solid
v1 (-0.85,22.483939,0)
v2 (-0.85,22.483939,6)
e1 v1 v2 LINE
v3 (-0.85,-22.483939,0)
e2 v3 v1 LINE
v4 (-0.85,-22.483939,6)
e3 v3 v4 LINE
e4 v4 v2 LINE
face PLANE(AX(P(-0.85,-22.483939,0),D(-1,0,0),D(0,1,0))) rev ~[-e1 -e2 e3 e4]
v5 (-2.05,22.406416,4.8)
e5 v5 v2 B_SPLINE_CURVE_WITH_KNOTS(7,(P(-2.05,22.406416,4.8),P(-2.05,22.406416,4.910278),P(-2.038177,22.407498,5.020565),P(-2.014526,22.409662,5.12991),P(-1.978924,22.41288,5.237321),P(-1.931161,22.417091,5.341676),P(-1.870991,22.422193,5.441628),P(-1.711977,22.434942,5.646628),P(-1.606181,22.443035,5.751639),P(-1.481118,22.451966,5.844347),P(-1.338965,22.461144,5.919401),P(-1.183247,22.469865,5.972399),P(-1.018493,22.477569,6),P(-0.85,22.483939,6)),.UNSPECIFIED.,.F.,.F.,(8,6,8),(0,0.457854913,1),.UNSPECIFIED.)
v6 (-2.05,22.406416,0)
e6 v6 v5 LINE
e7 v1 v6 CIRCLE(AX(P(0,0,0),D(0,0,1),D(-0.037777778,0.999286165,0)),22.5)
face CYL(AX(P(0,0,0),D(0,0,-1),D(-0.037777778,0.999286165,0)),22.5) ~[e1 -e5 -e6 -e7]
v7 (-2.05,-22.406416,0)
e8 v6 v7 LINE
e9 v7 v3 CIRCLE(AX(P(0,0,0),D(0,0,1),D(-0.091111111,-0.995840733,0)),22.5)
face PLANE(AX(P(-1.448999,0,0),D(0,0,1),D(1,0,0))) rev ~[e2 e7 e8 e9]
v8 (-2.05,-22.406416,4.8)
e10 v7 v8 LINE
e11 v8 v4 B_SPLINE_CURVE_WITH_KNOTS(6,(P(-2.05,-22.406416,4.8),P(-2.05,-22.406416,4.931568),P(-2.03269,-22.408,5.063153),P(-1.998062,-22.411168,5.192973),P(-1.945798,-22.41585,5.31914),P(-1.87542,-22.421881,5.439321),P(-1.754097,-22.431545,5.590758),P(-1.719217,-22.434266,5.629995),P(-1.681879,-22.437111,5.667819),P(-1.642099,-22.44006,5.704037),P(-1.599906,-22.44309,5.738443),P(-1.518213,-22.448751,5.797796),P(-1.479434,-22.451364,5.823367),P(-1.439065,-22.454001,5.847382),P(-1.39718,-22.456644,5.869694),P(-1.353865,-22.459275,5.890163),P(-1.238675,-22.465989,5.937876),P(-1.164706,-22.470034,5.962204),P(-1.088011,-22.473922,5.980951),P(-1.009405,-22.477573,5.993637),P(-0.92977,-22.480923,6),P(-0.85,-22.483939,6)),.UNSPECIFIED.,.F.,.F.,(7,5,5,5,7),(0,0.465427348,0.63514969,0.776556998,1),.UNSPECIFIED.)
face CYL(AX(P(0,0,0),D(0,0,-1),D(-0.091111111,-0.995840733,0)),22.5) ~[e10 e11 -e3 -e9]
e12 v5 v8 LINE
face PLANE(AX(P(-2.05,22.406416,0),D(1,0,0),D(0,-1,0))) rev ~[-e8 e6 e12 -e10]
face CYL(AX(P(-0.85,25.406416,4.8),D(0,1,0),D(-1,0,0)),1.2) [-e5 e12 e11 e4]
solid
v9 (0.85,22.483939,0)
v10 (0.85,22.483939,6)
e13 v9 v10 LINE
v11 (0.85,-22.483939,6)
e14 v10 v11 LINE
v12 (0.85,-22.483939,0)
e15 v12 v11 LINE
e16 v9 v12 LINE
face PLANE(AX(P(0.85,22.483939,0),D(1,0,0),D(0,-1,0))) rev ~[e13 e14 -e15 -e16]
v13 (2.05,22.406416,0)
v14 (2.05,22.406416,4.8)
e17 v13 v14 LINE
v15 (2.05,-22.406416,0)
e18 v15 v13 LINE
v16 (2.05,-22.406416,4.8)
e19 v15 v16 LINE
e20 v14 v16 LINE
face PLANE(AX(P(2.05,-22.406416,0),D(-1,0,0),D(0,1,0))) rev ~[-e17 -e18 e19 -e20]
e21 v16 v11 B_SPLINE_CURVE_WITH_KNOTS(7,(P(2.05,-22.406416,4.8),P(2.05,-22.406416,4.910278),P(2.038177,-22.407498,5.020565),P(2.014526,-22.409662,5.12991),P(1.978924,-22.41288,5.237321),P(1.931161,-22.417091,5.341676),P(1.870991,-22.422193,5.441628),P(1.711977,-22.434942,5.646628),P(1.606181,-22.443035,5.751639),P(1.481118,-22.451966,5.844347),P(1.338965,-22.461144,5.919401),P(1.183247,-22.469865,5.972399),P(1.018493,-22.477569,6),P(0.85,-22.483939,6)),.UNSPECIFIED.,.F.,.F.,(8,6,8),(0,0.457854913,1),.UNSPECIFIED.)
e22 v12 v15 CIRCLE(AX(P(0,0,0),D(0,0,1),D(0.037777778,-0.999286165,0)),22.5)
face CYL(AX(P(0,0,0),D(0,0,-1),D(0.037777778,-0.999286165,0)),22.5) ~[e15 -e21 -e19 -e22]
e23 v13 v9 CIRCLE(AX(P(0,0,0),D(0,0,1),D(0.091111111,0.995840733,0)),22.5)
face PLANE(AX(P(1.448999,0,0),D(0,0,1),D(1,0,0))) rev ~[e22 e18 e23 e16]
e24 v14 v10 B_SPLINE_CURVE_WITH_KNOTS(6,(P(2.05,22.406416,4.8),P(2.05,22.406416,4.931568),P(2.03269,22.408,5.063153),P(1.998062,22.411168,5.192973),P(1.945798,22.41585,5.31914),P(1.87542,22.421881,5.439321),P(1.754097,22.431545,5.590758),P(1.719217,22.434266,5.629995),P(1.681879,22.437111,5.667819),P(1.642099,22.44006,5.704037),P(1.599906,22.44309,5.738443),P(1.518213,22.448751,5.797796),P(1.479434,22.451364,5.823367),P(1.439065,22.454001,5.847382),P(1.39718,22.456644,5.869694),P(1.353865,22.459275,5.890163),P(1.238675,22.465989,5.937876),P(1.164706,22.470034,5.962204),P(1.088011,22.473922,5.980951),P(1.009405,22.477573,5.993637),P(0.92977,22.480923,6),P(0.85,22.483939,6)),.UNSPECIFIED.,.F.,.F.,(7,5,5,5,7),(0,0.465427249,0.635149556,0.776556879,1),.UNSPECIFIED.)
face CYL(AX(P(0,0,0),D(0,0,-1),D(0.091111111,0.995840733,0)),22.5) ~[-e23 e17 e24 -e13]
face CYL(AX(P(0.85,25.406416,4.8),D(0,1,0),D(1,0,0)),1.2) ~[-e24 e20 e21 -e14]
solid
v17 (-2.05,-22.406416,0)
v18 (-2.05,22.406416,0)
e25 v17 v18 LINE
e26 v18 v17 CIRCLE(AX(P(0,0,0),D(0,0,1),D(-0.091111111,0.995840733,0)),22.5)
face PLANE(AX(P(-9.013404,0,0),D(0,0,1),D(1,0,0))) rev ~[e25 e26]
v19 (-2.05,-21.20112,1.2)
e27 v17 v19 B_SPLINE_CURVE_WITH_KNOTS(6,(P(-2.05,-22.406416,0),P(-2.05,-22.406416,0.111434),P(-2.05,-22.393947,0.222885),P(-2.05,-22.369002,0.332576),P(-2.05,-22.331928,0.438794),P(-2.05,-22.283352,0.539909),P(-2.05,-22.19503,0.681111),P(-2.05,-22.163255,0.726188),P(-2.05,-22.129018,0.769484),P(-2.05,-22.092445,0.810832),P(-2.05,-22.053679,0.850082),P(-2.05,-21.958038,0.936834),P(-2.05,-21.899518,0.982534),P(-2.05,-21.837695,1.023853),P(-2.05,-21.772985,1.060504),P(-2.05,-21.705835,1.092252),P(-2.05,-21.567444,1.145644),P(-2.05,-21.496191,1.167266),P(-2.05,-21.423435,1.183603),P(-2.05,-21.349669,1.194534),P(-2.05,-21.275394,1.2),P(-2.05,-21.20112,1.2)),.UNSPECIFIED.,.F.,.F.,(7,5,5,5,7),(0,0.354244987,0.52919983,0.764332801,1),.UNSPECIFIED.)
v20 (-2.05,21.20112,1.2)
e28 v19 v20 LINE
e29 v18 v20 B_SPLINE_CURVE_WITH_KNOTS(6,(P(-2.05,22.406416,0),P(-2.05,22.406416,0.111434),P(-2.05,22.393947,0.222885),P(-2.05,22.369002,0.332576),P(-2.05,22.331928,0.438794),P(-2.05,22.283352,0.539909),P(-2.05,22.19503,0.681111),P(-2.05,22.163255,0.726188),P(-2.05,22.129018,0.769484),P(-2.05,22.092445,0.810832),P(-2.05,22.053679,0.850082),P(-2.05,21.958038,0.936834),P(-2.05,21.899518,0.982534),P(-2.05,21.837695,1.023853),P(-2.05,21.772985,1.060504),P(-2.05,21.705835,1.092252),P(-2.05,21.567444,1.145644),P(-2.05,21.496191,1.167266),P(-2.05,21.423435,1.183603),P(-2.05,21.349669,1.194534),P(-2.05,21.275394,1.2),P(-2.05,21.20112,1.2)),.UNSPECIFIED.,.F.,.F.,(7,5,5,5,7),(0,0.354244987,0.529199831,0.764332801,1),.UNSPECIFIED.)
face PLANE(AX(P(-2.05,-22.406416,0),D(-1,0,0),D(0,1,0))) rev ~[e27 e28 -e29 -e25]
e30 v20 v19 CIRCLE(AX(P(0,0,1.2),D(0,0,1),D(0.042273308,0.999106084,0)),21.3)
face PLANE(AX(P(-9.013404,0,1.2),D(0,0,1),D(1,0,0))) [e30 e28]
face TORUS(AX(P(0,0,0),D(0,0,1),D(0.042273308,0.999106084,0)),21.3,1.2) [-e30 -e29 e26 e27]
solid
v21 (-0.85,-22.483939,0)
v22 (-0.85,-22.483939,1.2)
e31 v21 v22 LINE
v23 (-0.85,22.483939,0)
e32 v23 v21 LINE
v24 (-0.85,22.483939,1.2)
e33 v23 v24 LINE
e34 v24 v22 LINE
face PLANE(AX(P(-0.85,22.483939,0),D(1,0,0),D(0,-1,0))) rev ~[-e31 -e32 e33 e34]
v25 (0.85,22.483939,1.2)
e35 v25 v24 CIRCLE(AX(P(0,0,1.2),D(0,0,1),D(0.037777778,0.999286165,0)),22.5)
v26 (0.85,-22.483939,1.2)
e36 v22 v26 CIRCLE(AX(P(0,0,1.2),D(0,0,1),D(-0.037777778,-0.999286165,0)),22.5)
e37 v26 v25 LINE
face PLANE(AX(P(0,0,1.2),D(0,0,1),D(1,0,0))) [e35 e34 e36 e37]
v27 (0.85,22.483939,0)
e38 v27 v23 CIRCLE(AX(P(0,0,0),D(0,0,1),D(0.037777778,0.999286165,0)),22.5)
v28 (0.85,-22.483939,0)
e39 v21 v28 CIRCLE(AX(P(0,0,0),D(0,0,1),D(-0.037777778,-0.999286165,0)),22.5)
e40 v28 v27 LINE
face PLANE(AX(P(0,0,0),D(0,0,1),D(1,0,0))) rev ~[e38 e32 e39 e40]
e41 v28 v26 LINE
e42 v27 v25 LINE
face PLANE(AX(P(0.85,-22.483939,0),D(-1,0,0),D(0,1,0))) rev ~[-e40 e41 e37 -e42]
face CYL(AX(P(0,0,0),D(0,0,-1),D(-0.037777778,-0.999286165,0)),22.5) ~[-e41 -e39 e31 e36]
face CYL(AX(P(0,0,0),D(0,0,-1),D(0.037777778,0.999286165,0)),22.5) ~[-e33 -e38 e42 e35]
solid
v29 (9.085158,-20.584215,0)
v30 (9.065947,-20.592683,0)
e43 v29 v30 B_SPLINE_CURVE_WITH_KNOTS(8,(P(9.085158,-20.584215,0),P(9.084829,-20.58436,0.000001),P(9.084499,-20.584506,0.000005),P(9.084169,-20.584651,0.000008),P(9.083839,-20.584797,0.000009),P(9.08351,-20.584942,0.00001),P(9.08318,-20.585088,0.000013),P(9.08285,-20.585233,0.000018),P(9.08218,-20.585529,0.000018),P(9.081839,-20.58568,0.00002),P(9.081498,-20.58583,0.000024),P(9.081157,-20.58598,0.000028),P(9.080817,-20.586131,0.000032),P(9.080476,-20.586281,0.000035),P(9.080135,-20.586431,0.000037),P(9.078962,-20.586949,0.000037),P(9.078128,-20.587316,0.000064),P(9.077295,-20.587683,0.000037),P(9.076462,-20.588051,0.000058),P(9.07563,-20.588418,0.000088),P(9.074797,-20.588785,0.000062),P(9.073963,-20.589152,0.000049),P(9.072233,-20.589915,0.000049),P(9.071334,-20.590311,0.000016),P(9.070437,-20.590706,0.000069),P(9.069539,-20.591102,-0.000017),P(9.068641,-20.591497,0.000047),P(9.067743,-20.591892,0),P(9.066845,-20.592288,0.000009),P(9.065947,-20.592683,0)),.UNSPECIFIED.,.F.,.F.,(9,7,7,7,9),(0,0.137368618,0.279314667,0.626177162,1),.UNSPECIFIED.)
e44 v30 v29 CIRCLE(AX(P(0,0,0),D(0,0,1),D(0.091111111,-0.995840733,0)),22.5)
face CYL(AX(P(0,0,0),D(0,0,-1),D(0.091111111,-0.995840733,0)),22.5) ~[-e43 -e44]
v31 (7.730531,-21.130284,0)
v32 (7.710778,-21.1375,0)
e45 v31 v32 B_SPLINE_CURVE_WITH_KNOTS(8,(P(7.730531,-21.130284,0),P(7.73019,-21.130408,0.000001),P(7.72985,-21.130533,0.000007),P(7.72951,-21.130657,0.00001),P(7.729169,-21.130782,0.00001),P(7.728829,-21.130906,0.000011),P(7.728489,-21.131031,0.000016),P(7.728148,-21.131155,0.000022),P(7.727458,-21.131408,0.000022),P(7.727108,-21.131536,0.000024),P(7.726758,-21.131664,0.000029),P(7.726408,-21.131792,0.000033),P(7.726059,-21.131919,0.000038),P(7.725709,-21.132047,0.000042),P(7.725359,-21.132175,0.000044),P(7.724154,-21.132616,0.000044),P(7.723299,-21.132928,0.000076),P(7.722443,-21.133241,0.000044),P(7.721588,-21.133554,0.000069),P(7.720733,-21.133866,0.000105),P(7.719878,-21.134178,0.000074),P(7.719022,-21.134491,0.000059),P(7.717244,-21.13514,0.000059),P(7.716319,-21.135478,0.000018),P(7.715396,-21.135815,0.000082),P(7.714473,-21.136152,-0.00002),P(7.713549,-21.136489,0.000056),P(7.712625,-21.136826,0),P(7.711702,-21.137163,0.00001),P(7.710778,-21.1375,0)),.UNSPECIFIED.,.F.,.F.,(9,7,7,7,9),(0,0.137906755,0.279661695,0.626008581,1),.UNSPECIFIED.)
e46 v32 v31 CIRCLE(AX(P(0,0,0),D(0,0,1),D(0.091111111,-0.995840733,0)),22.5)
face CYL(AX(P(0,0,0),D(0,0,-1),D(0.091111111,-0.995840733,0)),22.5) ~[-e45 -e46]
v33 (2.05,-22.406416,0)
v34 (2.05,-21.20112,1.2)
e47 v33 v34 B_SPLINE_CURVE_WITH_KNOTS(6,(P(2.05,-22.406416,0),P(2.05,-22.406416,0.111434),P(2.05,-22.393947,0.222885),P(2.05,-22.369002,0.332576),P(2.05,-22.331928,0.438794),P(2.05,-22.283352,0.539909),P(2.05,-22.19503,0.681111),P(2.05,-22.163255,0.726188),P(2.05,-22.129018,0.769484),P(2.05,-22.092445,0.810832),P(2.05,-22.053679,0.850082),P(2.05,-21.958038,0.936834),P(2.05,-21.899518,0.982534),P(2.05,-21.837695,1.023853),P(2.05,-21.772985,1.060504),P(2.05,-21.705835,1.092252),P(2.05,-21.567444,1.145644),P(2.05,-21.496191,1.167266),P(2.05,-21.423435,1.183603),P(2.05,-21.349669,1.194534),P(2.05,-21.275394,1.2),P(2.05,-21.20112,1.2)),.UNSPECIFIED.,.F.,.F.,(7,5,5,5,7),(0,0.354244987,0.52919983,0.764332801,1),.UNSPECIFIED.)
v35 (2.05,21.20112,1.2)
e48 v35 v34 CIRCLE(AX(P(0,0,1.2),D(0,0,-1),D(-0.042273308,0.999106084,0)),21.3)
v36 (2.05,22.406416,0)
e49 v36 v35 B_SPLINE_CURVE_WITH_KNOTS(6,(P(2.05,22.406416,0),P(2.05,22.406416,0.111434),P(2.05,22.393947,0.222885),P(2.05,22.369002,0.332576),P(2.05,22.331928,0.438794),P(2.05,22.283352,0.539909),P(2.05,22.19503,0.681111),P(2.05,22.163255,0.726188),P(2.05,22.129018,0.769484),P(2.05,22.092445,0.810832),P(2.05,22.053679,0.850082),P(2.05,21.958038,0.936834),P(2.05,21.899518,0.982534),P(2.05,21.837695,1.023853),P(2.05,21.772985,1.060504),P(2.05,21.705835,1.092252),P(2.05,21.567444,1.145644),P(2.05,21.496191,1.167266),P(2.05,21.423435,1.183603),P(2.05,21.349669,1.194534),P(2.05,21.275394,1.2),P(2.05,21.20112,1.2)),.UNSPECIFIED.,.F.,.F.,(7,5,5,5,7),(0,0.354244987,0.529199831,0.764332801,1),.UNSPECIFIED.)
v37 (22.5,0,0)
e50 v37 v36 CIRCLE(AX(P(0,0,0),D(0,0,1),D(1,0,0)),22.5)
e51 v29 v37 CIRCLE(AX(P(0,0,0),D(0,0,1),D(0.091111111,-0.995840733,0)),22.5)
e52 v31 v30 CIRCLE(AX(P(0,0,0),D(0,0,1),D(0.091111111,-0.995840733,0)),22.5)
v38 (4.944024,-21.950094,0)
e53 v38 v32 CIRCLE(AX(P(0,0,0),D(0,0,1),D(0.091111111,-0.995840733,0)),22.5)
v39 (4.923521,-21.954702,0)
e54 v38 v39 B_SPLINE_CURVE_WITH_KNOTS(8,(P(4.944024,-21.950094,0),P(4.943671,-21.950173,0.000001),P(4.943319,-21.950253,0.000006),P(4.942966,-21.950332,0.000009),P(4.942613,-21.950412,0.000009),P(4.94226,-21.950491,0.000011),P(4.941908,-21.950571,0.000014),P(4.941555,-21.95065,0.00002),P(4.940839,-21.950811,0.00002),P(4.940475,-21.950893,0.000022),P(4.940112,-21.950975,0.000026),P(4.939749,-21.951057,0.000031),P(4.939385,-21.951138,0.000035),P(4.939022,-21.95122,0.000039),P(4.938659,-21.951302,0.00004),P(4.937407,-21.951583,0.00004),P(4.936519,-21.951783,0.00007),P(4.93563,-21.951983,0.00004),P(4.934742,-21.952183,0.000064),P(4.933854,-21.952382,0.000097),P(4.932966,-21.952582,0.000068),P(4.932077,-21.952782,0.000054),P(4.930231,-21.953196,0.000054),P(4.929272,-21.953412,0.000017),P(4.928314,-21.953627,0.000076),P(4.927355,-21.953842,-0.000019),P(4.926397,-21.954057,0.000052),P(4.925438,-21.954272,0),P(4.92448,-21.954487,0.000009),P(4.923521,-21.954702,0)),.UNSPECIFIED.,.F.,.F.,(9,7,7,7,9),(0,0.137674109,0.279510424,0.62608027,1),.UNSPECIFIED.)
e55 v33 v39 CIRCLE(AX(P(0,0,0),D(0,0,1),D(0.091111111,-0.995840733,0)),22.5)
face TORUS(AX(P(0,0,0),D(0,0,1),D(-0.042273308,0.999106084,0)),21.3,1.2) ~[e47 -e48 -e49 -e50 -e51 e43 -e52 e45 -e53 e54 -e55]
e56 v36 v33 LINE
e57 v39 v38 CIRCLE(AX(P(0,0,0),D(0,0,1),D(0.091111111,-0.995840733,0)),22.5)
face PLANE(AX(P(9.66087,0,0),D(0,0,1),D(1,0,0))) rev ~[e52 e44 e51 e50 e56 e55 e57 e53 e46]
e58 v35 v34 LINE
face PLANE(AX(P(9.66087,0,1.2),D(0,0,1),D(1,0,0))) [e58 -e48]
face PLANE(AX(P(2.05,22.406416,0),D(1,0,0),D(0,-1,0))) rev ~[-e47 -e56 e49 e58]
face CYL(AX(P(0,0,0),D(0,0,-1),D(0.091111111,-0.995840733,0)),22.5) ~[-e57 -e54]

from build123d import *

# Parameters (mm, degrees)
F1_DEPTH      = 1.2
F2_DEPTH      = 6
F3_T2_ANGLE   = 184.8456081764
F3_2_T2_ANGLE = 184.8456081764
F3_3_T1_DEPTH = 50.8128329834
F3_4_T1_DEPTH = 50.8128329834


# Not quite as in the source:
# - a fillet or chamfer that OpenCascade refuses, or shapes differently, is made with other operations: its cross-section is extruded or revolved along the edge and cut away or added


with BuildPart() as f1:
    # F0 (on Top) → F1 (new body)
    with BuildSketch(Plane.XY):
        with BuildLine():
            Line((-2.05, -22.4064164917), (-2.05, 22.4064164917))
            ThreePointArc((-2.05, 22.4064164917), (-22.5, 0), (-2.05, -22.4064164917))
        make_face()
    extrude(amount=F1_DEPTH)

    # F3: fillet of radius 1.2 on 1 edges, made by hand

    # F3_s1 → F3_t2 (revolve, cut)
    with BuildSketch(Plane(origin=(0, 0, 0), x_dir=(0, 0, 1), z_dir=(0.9991060842, -0.0422733077, 0))):
        with BuildLine():
            ThreePointArc((0, -22.5), (0.8485281374, -22.1485281374), (1.2, -21.3))
            Line((1.2, -21.3), (1.2, -22.5))
            Line((1.2, -22.5), (0, -22.5))
        make_face()
    revolve(axis=Axis((0, 0, 1.2), (0, 0, 1)), revolution_arc=F3_T2_ANGLE, mode=Mode.SUBTRACT)


with BuildPart() as f1b:
    # F0 (on Top) → F1, piece 2 (new body)
    with BuildSketch(Plane.XY):
        with BuildLine():
            Line((0.85, -22.4839387119), (0.85, 22.4839387119))
            ThreePointArc((0.85, 22.4839387119), (0, 22.5), (-0.85, 22.4839387119))
            Line((-0.85, 22.4839387119), (-0.85, -22.4839387119))
            ThreePointArc((-0.85, -22.4839387119), (0, -22.5), (0.85, -22.4839387119))
        make_face()
    extrude(amount=F1_DEPTH)


with BuildPart() as f1c:
    # F0 (on Top) → F1, piece 3 (new body)
    with BuildSketch(Plane.XY):
        with BuildLine():
            ThreePointArc((2.05, -22.4064164917), (16.6188898546, -15.1678113121), (22.5, 0))
            ThreePointArc((22.5, 0), (16.6188898546, 15.1678113121), (2.05, 22.4064164917))
            Line((2.05, 22.4064164917), (2.05, -22.4064164917))
        make_face()
    extrude(amount=F1_DEPTH)

    # F3#2: fillet of radius 1.2 on 1 edges, made by hand

    # F3_2_s1 → F3_2_t2 (revolve, cut)
    with BuildSketch(Plane(origin=(0, 0, 0), x_dir=(0, 0, 1), z_dir=(-0.9991060842, -0.0422733077, 0))):
        with BuildLine():
            ThreePointArc((0, 22.5), (0.8485281374, 22.1485281374), (1.2, 21.3))
            Line((1.2, 21.3), (1.2, 22.5))
            Line((1.2, 22.5), (0, 22.5))
        make_face()
    revolve(axis=Axis((0, 0, 1.2), (0, 0, -1)), revolution_arc=F3_2_T2_ANGLE, mode=Mode.SUBTRACT)


with BuildPart() as f2:
    # F0 (on Top) → F2 (new body)
    with BuildSketch(Plane.XY):
        with BuildLine():
            Line((2.05, -22.4064164917), (2.05, 22.4064164917))
            ThreePointArc((2.05, 22.4064164917), (1.4505179846, 22.4531957097), (0.85, 22.4839387119))
            Line((0.85, 22.4839387119), (0.85, -22.4839387119))
            ThreePointArc((0.85, -22.4839387119), (1.4505179846, -22.4531957097), (2.05, -22.4064164917))
        make_face()
    extrude(amount=F2_DEPTH)

    # F3#3: fillet of radius 1.2 on 1 edges, made by hand

    # F3_3_s2 → F3_3_t1 (cut)
    with BuildSketch(Plane.XZ.offset(-25.4064164917)):
        with BuildLine():
            ThreePointArc((2.05, 4.8), (1.6985281374, 5.6485281374), (0.85, 6))
            Line((0.85, 6), (2.05, 6))
            Line((2.05, 6), (2.05, 4.8))
        make_face()
    extrude(amount=F3_3_T1_DEPTH, mode=Mode.SUBTRACT)


with BuildPart() as f2b:
    # F0 (on Top) → F2, piece 2 (new body)
    with BuildSketch(Plane.XY):
        with BuildLine():
            Line((-0.85, -22.4839387119), (-0.85, 22.4839387119))
            ThreePointArc((-0.85, 22.4839387119), (-1.4505179846, 22.4531957097), (-2.05, 22.4064164917))
            Line((-2.05, 22.4064164917), (-2.05, -22.4064164917))
            ThreePointArc((-2.05, -22.4064164917), (-1.4505179846, -22.4531957097), (-0.85, -22.4839387119))
        make_face()
    extrude(amount=F2_DEPTH)

    # F3#4: fillet of radius 1.2 on 1 edges, made by hand

    # F3_4_s2 → F3_4_t1 (cut)
    with BuildSketch(Plane.XZ.offset(-25.4064164917)):
        with BuildLine():
            ThreePointArc((-2.05, 4.8), (-1.6985281374, 5.6485281374), (-0.85, 6))
            Line((-0.85, 6), (-2.05, 6))
            Line((-2.05, 6), (-2.05, 4.8))
        make_face()
    extrude(amount=F3_4_T1_DEPTH, mode=Mode.SUBTRACT)


solid = Compound([f1.part, f1b.part, f1c.part, f2.part, f2b.part])
